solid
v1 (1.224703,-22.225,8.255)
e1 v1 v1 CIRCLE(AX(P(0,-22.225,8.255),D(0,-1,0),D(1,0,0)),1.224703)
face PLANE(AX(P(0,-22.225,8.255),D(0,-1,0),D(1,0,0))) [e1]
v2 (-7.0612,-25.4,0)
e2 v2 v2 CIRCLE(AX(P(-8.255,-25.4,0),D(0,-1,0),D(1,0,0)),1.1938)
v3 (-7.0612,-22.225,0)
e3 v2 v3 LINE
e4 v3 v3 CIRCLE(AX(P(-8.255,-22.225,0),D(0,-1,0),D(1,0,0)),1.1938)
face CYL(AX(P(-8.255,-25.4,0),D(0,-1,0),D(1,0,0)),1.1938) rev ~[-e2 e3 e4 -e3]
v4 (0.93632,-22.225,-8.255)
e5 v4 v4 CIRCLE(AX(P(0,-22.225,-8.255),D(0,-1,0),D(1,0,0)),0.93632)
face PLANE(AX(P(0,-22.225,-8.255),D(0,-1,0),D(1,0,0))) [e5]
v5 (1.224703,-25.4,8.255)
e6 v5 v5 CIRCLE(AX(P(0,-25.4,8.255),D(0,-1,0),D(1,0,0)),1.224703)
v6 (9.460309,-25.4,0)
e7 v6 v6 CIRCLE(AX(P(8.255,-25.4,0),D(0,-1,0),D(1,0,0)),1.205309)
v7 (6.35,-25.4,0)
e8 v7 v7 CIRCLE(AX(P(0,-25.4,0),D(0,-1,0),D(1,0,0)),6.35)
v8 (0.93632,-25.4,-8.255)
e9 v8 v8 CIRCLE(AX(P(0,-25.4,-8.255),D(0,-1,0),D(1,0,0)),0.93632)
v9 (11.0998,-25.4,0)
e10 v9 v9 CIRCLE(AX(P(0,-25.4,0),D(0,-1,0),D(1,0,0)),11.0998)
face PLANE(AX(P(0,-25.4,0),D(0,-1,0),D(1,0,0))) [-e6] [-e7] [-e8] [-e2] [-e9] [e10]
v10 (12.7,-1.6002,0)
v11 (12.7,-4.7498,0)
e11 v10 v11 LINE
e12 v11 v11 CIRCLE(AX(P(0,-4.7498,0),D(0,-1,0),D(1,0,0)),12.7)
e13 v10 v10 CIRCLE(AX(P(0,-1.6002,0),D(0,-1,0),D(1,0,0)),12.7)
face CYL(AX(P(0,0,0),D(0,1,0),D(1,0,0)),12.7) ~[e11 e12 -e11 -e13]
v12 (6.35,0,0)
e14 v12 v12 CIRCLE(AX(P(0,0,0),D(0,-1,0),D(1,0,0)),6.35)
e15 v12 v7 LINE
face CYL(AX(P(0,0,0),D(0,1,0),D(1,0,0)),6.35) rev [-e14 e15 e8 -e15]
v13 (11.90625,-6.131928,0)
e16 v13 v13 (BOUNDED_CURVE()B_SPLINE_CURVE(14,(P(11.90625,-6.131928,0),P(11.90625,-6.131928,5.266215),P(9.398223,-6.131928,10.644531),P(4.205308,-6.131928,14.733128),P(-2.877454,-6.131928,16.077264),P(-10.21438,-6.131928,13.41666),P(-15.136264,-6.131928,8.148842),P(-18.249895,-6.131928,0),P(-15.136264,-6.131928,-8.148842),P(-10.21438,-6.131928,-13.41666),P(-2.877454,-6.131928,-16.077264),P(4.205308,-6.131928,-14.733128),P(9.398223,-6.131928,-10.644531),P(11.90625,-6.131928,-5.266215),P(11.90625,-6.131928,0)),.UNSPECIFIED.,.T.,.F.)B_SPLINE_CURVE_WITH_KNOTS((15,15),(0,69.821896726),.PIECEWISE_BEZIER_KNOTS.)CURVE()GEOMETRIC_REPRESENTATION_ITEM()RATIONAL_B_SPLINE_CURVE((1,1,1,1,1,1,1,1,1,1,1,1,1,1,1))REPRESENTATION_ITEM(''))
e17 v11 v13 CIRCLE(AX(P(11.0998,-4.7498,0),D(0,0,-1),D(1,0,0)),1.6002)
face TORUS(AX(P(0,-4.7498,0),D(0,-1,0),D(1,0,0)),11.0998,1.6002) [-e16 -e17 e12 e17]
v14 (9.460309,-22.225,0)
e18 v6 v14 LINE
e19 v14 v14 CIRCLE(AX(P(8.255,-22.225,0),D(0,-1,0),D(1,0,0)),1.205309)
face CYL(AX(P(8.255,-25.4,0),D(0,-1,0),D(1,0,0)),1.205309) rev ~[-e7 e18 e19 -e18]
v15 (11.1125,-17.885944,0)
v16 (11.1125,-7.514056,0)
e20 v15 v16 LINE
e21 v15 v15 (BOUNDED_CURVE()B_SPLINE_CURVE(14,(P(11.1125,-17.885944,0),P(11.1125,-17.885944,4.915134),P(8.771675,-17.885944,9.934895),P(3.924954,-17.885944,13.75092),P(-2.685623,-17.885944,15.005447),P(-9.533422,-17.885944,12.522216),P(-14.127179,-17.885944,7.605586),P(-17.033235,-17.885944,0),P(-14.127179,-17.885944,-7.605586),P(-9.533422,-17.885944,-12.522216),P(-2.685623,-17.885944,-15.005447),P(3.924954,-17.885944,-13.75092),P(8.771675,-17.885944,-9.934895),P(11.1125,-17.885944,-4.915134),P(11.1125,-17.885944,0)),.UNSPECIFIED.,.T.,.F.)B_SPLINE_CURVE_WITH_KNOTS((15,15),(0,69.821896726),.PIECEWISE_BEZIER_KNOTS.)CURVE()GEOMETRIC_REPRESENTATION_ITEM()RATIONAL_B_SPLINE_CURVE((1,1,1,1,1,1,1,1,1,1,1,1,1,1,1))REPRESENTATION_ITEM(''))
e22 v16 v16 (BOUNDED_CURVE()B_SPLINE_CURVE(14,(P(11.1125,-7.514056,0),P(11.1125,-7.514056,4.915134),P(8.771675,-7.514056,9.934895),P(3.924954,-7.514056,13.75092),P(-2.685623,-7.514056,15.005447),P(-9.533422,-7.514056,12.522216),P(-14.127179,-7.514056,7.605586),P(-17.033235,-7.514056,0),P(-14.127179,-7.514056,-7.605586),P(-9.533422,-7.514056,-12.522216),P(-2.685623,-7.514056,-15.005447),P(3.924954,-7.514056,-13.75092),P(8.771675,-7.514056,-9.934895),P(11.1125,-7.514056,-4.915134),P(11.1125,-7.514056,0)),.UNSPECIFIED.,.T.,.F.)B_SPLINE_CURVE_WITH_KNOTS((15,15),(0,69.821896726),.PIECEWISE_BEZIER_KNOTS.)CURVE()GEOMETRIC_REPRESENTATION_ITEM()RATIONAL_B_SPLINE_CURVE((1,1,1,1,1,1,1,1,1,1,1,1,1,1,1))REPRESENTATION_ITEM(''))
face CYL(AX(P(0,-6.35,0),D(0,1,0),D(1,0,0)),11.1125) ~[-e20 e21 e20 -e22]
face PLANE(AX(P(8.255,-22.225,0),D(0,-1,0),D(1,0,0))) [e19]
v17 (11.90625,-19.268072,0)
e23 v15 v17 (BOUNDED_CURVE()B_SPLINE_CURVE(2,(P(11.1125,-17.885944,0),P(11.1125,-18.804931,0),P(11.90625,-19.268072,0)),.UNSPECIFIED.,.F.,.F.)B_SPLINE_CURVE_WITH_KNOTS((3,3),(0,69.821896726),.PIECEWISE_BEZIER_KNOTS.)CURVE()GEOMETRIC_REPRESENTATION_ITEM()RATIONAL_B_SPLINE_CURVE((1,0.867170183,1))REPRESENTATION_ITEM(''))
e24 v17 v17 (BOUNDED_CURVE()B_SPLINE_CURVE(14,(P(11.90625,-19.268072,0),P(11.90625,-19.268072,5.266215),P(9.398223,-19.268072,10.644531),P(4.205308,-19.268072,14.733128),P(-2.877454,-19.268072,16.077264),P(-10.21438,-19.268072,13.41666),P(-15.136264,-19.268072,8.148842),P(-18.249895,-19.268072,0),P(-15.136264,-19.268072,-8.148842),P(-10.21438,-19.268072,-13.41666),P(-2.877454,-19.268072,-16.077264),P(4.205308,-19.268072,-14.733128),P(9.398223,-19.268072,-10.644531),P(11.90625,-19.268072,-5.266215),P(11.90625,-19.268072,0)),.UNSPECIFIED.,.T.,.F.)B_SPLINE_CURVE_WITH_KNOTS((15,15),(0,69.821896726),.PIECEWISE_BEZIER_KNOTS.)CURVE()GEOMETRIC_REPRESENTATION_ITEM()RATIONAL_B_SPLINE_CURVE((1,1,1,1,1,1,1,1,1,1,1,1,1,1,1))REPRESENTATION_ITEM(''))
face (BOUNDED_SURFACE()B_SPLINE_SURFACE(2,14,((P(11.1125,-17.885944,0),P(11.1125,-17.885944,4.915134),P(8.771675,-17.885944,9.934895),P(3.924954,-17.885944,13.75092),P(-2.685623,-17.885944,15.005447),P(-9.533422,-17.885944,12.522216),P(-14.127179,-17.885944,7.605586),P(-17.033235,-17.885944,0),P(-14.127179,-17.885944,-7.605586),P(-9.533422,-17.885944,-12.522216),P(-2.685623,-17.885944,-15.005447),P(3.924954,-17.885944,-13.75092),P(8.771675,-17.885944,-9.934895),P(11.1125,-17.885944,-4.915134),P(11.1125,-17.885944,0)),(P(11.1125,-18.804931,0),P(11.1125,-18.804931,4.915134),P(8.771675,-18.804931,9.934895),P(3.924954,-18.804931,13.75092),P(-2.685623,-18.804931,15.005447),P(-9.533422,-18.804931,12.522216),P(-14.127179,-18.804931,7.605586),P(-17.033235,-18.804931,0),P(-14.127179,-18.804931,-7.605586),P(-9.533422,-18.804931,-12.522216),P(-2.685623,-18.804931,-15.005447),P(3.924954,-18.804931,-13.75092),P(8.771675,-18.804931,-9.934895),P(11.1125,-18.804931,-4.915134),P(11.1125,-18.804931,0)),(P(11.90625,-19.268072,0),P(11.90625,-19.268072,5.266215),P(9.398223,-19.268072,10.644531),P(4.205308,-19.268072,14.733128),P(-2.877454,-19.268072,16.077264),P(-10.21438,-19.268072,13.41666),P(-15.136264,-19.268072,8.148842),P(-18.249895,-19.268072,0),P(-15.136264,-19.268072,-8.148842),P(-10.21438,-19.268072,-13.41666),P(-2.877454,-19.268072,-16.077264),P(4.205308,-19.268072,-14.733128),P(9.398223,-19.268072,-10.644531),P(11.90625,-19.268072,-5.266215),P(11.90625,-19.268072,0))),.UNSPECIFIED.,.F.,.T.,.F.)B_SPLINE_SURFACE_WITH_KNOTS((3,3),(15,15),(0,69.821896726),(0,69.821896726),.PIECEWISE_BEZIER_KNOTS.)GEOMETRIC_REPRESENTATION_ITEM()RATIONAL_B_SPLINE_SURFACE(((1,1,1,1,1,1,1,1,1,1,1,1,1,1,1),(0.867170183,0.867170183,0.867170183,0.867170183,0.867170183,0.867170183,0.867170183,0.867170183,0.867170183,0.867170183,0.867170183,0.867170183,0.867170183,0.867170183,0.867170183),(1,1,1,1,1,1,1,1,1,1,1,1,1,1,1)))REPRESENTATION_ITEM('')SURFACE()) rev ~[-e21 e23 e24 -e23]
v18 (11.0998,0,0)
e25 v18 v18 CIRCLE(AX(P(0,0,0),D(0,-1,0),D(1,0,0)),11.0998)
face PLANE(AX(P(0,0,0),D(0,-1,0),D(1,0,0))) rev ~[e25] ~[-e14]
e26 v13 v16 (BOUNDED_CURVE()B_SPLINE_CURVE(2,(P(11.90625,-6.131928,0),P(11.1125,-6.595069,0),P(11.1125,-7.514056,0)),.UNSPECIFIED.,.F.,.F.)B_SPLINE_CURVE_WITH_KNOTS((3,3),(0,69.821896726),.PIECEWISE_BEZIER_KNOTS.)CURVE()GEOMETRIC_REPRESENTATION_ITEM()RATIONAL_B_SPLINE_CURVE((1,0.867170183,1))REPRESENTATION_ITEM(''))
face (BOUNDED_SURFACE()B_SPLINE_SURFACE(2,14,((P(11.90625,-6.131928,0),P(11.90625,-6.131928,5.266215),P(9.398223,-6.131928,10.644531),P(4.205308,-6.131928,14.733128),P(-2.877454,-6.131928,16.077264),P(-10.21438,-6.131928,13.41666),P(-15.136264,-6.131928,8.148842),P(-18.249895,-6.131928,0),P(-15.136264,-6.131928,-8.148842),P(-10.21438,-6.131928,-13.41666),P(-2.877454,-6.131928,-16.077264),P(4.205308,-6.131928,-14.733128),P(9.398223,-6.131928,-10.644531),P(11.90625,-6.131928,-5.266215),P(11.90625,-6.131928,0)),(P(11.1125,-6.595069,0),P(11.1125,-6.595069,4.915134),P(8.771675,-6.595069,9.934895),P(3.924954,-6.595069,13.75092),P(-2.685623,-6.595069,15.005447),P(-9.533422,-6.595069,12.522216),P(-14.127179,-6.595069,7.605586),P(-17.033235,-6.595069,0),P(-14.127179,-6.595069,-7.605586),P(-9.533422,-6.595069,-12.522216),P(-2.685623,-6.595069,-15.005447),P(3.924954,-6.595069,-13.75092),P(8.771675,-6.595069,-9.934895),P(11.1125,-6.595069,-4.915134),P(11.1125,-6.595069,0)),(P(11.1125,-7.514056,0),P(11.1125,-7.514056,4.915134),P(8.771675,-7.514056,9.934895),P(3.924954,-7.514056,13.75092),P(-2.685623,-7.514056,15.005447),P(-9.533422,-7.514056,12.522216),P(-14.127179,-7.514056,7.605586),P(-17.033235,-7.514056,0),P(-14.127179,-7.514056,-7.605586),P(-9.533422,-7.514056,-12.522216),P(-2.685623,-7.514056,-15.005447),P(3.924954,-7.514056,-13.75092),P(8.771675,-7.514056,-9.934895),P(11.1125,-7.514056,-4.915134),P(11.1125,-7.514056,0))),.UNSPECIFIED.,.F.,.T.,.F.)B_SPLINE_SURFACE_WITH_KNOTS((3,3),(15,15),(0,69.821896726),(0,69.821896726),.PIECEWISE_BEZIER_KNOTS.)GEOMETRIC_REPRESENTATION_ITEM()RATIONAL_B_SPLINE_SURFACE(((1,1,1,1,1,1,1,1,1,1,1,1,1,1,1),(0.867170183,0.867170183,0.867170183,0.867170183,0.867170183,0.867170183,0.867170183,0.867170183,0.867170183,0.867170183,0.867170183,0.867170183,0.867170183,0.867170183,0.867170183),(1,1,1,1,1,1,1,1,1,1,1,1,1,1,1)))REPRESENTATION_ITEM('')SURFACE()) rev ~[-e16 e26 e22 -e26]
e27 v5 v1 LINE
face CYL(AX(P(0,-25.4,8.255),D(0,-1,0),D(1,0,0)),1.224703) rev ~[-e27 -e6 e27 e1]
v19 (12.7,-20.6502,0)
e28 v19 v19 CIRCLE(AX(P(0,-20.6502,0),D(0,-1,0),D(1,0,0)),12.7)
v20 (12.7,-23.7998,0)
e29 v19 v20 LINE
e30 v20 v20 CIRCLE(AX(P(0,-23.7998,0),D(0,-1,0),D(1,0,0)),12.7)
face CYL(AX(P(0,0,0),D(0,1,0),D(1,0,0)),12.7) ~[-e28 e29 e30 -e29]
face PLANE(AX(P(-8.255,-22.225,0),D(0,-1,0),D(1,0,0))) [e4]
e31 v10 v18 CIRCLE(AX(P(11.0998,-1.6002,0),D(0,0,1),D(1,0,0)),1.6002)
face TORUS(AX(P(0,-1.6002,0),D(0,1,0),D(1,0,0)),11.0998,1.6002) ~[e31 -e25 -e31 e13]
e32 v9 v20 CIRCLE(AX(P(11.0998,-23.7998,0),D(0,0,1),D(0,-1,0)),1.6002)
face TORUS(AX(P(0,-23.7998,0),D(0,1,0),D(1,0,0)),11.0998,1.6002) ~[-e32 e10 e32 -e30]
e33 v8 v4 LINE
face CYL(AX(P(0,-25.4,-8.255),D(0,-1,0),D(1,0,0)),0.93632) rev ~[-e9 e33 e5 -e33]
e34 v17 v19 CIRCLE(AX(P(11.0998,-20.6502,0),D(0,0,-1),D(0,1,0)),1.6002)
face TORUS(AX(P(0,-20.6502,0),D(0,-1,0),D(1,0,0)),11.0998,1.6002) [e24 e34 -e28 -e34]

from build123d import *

# Parameters (mm, degrees)
F0_R          = 12.7
F0_R_2        = 6.35
F1_DEPTH      = 25.4
F2_R          = 3.3757627259
F3_DEPTH      = 6.35
F4_R          = 12.7
F4_R_2        = 11.1125
F5_DEPTH      = 12.7
F6_R          = 4.2817922897
F7_DEPTH      = 25.4
F8_R          = 1.2247027219
F8_R_2        = 1.2053090412
F8_R_3        = 0.9363200651
F8_R_4        = 1.1938
F9_DEPTH      = 3.175
F10_S7_R      = 11.1125
F10_T8_DEPTH  = 21
F10_S13_R     = 11.1125
F10_T14_DEPTH = 21
F11_R         = 1.6002


# Not quite as in the source:
# - a fillet or chamfer that OpenCascade refuses, or shapes differently, is made with other operations: its cross-section is extruded or revolved along the edge and cut away or added


with BuildPart() as f1:
    # F0 (on Front) → F1 (new body)
    with BuildSketch(Plane.XZ):
        Circle(F0_R)
        Circle(F0_R_2, mode=Mode.SUBTRACT)
    extrude(amount=F1_DEPTH)

    # F4 (on face) → F5 (cut)
    with BuildSketch(Plane.XZ.offset(6.35)):
        Circle(F4_R)
        Circle(F4_R_2, mode=Mode.SUBTRACT)
    extrude(amount=F5_DEPTH, mode=Mode.SUBTRACT)

    # F8 (on face) → F9 (cut)
    with BuildSketch(Plane.XZ.offset(25.4)):
        with Locations((0, 8.255)):
            Circle(F8_R)
        with Locations((8.255, 0)):
            Circle(F8_R_2)
        with Locations((0, -8.255)):
            Circle(F8_R_3)
        with Locations((-8.255, 0)):
            Circle(F8_R_4)
    extrude(amount=-F9_DEPTH, mode=Mode.SUBTRACT)

    # F10: fillet of radius 1.6002 on 4 edges, made by hand

    # F10_s1 → F10_t2 (revolve, cut)
    with BuildSketch(Plane.XY):
        with BuildLine():
            ThreePointArc((11.0998, -25.4), (12.2313122713, -24.9313122713), (12.7, -23.7998))
            Line((12.7, -23.7998), (12.7, -25.4))
            Line((12.7, -25.4), (11.0998, -25.4))
        make_face()
    revolve(axis=Axis((0, -25.4, 0), (0, -1, 0)), mode=Mode.SUBTRACT)


with BuildPart() as f3:
    # F2 (on Front) → F3 (new body)
    with BuildSketch(Plane.XZ):
        Circle(F2_R)
    extrude(amount=F3_DEPTH)

    # F6 (on face) → F7 (cut)
    with BuildSketch(Plane.XZ.offset(6.35)):
        Circle(F6_R)
    extrude(amount=-F7_DEPTH, mode=Mode.SUBTRACT)


with BuildPart() as f10_tool4:
    # F10_s5 → F10_t6 (revolve)
    with BuildSketch(Plane.XY):
        with BuildLine():
            ThreePointArc((11.0998, -19.05), (12.2313122713, -19.5186877287), (12.7, -20.6502))
            Line((12.7, -20.6502), (12.7, -19.05))
            Line((12.7, -19.05), (11.0998, -19.05))
        make_face()
    revolve(axis=Axis((0, -19.05, 0), (0, -1, 0)))

    # F10_s7 → F10_t8 (cut, symmetric)
    with BuildSketch(Plane.XZ.offset(20.4)):
        Circle(F10_S7_R)
    extrude(amount=F10_T8_DEPTH, both=True, mode=Mode.SUBTRACT)


with BuildPart() as f1_1:
    add(f1.part)

    # F10_t3: cut F10_tool4
    add(f10_tool4.part, mode=Mode.SUBTRACT)


with BuildPart() as f10_tool10:
    # F10_s11 → F10_t12 (revolve)
    with BuildSketch(Plane.XY):
        with BuildLine():
            ThreePointArc((12.7, -4.7498), (12.2313122713, -5.8813122713), (11.0998, -6.35))
            Line((11.0998, -6.35), (12.7, -6.35))
            Line((12.7, -6.35), (12.7, -4.7498))
        make_face()
    revolve(axis=Axis((0, -6.35, 0), (0, -1, 0)))

    # F10_s13 → F10_t14 (cut, symmetric)
    with BuildSketch(Plane.XZ.offset(5.5)):
        Circle(F10_S13_R)
    extrude(amount=F10_T14_DEPTH, both=True, mode=Mode.SUBTRACT)


with BuildPart() as f1_2:
    add(f1_1.part)

    # F10_t9: cut F10_tool10
    add(f10_tool10.part, mode=Mode.SUBTRACT)

    # F10_s15 → F10_t16 (revolve, cut)
    with BuildSketch(Plane.XY):
        with BuildLine():
            ThreePointArc((12.7, -1.6002), (12.2313122713, -0.4686877287), (11.0998, 0))
            Line((11.0998, 0), (12.7, 0))
            Line((12.7, 0), (12.7, -1.6002))
        make_face()
    revolve(axis=Axis((0, 0, 0), (0, -1, 0)), mode=Mode.SUBTRACT)

    # F11
    f11_edges = [f1_2.edges().sort_by_distance(p)[0] for p in [
        (-11.1125, -19.05005, 0),
        (-11.1125, -6.34995, 0),
    ]]
    fillet(f11_edges, radius=F11_R)


solid = f1_2.part
